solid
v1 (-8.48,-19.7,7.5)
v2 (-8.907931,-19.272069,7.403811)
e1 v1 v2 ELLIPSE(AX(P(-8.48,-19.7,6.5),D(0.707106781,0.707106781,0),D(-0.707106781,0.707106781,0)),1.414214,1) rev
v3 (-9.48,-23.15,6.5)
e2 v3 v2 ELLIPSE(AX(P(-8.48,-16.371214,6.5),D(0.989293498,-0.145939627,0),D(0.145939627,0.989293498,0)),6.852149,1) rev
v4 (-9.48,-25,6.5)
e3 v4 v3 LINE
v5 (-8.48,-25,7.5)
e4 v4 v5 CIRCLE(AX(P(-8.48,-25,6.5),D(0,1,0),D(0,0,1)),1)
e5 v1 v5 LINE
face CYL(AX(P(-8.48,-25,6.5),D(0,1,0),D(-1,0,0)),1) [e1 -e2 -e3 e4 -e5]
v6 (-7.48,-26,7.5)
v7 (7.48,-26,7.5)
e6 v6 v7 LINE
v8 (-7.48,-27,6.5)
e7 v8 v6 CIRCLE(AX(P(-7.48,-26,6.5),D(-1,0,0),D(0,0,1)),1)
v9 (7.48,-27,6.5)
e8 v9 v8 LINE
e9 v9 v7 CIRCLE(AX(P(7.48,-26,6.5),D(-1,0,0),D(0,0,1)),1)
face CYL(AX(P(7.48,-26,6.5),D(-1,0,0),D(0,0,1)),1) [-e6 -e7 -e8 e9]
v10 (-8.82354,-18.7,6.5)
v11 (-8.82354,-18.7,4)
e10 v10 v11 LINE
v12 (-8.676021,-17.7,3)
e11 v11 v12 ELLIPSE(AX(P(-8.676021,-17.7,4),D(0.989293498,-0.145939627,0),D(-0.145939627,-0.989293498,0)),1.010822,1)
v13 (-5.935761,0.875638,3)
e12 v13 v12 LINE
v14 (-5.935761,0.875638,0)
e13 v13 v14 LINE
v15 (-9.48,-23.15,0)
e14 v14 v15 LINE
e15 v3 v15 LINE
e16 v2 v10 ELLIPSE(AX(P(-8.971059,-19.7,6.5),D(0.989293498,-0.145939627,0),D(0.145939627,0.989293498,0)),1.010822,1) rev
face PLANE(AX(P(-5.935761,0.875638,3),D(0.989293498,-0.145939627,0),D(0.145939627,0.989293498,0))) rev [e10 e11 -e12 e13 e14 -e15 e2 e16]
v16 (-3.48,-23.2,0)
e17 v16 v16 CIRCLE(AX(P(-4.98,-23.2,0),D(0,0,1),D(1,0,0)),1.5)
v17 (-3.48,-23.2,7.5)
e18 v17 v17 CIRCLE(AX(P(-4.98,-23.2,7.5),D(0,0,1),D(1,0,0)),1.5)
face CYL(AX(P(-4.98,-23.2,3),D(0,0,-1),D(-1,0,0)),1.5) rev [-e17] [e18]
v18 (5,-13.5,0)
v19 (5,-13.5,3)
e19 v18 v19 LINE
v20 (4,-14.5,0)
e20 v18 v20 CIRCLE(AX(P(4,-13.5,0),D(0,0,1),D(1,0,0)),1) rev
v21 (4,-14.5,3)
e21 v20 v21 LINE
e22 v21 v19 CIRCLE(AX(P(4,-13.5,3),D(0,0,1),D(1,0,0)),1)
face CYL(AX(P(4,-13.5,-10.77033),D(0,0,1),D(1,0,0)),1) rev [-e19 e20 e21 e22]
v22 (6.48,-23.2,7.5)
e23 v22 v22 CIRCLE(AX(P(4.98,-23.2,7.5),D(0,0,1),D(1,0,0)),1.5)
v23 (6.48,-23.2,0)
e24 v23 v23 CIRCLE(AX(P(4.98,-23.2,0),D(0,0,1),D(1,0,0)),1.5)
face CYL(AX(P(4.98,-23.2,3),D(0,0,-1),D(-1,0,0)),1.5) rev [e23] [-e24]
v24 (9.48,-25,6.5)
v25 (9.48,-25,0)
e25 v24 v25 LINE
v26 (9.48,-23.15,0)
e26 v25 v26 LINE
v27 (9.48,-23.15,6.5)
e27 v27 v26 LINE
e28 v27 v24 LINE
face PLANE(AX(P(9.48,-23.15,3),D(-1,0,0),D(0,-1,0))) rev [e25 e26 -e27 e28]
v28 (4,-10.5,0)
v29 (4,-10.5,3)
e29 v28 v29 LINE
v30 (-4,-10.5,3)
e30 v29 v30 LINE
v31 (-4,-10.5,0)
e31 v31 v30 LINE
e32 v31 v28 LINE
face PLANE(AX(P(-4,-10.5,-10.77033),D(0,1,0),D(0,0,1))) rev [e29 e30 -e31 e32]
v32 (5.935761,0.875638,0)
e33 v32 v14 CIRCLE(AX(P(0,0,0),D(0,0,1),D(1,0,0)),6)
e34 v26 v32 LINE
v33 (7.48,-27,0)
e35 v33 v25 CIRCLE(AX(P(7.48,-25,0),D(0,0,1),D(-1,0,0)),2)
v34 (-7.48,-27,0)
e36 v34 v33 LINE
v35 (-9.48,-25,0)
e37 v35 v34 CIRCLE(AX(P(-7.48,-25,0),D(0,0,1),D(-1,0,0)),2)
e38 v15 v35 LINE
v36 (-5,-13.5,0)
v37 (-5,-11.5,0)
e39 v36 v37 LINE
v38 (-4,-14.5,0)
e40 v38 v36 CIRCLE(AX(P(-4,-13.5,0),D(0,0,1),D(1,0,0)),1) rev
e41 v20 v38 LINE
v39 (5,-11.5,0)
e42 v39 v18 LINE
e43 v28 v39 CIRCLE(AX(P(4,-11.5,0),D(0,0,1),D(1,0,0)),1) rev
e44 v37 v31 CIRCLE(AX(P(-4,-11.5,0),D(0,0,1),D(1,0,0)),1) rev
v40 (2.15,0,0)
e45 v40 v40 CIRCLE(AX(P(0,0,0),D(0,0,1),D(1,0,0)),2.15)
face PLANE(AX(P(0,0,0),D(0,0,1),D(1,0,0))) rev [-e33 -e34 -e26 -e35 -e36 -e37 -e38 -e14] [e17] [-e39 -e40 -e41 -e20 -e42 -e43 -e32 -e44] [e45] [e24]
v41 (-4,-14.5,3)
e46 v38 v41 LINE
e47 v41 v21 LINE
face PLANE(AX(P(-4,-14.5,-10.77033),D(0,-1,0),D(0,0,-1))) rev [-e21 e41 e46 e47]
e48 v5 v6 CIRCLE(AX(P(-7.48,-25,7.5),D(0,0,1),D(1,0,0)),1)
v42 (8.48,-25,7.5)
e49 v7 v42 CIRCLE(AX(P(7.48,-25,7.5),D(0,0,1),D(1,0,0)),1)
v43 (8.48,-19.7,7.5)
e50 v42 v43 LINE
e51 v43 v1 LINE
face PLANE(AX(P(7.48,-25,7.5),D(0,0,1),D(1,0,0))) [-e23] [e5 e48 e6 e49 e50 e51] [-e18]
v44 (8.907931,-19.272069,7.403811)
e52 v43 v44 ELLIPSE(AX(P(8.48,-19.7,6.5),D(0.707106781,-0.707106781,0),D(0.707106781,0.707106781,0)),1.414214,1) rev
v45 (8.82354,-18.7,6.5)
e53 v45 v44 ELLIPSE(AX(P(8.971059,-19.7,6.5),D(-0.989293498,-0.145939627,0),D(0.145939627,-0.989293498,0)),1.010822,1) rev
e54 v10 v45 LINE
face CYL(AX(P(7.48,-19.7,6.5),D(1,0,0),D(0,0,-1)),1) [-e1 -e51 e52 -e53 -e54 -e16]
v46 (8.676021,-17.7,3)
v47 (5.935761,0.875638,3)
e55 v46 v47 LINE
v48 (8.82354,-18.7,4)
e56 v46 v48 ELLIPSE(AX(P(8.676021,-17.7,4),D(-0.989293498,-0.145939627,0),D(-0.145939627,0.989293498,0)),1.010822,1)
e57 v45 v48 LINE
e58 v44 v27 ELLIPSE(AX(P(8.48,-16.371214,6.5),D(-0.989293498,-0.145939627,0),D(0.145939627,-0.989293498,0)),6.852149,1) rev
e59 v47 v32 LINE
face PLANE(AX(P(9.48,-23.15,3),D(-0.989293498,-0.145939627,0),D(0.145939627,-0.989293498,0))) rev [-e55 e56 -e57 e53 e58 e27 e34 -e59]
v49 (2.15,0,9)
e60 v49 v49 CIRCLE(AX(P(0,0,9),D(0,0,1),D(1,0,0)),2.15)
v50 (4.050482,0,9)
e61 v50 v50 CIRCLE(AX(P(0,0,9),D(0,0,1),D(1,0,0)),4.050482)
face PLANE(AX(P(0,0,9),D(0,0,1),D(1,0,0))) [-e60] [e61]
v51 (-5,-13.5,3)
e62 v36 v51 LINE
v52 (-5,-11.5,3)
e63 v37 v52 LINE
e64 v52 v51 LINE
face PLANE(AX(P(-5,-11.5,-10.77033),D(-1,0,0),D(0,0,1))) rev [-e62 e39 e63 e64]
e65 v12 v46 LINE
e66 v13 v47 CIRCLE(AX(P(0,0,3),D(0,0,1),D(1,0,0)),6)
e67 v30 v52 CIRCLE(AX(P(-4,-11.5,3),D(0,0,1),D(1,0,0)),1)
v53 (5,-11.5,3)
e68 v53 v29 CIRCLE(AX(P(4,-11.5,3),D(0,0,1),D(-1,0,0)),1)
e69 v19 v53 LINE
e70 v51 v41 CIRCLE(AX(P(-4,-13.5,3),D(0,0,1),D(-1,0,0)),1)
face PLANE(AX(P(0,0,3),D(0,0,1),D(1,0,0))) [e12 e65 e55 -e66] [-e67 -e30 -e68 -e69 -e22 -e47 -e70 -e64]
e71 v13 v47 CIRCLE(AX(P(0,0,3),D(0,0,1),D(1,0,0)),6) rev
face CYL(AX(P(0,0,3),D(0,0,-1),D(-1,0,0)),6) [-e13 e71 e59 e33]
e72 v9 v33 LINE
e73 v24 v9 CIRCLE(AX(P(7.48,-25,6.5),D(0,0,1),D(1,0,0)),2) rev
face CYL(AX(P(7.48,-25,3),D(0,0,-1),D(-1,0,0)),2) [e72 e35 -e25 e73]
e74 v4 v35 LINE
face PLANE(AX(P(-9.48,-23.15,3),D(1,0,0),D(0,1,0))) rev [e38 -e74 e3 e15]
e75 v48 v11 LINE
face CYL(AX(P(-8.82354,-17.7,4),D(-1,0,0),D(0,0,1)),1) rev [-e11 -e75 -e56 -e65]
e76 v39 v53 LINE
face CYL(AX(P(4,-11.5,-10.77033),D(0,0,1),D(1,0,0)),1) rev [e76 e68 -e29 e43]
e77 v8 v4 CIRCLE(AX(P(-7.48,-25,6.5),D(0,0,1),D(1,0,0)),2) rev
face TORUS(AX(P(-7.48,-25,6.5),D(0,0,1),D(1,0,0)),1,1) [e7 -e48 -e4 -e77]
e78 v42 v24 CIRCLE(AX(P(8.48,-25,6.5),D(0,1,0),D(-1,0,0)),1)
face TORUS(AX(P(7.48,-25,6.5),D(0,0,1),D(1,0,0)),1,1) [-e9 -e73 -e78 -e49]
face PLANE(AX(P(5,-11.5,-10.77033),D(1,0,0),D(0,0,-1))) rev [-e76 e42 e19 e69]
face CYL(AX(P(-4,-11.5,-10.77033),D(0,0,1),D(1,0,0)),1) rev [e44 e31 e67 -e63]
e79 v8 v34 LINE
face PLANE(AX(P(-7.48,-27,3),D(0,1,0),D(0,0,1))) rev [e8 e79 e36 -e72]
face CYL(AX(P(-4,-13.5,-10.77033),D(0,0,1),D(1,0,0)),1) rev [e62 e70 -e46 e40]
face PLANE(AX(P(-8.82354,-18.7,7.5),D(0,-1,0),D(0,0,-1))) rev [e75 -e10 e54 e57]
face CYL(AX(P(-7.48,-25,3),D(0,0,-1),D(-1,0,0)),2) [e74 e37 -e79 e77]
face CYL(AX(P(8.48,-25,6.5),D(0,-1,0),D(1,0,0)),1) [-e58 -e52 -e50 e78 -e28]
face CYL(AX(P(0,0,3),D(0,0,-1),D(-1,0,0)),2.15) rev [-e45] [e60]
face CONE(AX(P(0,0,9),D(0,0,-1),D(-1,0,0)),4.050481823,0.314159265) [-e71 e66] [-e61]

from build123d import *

# Parameters (mm, degrees)
SKETCH1_R       = 2.15
SKETCH1_R_2     = 1.5
EXTRUDE1_DEPTH  = 3
SKETCH2_R       = 6
SKETCH2_R_2     = 2.15
EXTRUDE2_DEPTH  = 6
EXTRUDE3_DEPTH  = 3
SKETCH4_R       = 1.5
EXTRUDE4_DEPTH  = 4.5
FILLET5_R       = 1
CHAMFER1_SIZE   = 6
CHAMFER1_SIZE_2 = 1.949518177


with BuildPart() as part:
    # Sketch1 → Extrude1 (new body)
    with BuildSketch(Plane.XY):
        with BuildLine():
            Line((-7.48, -27), (7.48, -27))
            ThreePointArc((7.48, -27), (8.894213562, -26.414213562), (9.48, -25))
            Line((9.48, -25), (9.48, -23.15))
            Line((9.48, -23.15), (5.935760988, 0.875637761))
            ThreePointArc((5.935760988, 0.875637761), (0, 6), (-5.935760988, 0.875637761))
            Line((-5.935760988, 0.875637761), (-9.48, -23.15))
            Line((-9.48, -23.15), (-9.48, -25))
            ThreePointArc((-9.48, -25), (-8.894213562, -26.414213562), (-7.48, -27))
        make_face()
        Circle(SKETCH1_R, mode=Mode.SUBTRACT)
        with Locations((-4.98, -23.2)):
            Circle(SKETCH1_R_2, mode=Mode.SUBTRACT)
        with Locations((4.98, -23.2)):
            Circle(SKETCH1_R_2, mode=Mode.SUBTRACT)
    extrude(amount=EXTRUDE1_DEPTH)

    # Sketch2 → Extrude2 (add)
    with BuildSketch(Plane.XY.offset(3)):
        with Locations(Location((0, 0, 0), (0, 0, 171.608305322))):
            Circle(SKETCH2_R)
        Circle(SKETCH2_R_2, mode=Mode.SUBTRACT)
    extrude(amount=EXTRUDE2_DEPTH)

    # Sketch3 → Extrude3 (cut)
    with BuildSketch(Plane.XY.offset(3)):
        with BuildLine():
            Line((-4, -10.5), (4, -10.5))
            ThreePointArc((4, -10.5), (4.707106781, -10.792893219), (5, -11.5))
            Line((5, -11.5), (5, -13.5))
            ThreePointArc((5, -13.5), (4.707106781, -14.207106781), (4, -14.5))
            Line((4, -14.5), (-4, -14.5))
            ThreePointArc((-4, -14.5), (-4.707106781, -14.207106781), (-5, -13.5))
            Line((-5, -13.5), (-5, -11.5))
            ThreePointArc((-5, -11.5), (-4.707106781, -10.792893219), (-4, -10.5))
        make_face()
    extrude(amount=-EXTRUDE3_DEPTH, mode=Mode.SUBTRACT)

    # Sketch4 → Extrude4 (add)
    with BuildSketch(Plane.XY.offset(3)):
        with BuildLine():
            Line((-7.48, -27), (7.48, -27))
            ThreePointArc((7.48, -27), (8.894213562, -26.414213562), (9.48, -25))
            Line((9.48, -25), (9.48, -23.15))
            Line((9.48, -23.15), (8.823540273, -18.7))
            Line((8.823540273, -18.7), (-8.823540273, -18.7))
            Line((-8.823540273, -18.7), (-9.48, -23.15))
            Line((-9.48, -23.15), (-9.48, -25))
            ThreePointArc((-9.48, -25), (-8.894213562, -26.414213562), (-7.48, -27))
        make_face()
        with Locations((-4.98, -23.2)):
            Circle(SKETCH4_R, mode=Mode.SUBTRACT)
        with Locations((4.98, -23.2)):
            Circle(SKETCH4_R, mode=Mode.SUBTRACT)
    extrude(amount=EXTRUDE4_DEPTH)

    # Fillet5
    # the kernel refuses this fillet: 1 mm, written as the material it adds along each edge
    with BuildSketch(Plane(origin=(14.823540273, -18.7, 3), x_dir=(0, 0, 1), z_dir=(-1, 0, 0))) as fillet5_piece_1_section:
        with BuildLine():
            CenterArc((FILLET5_R, FILLET5_R), FILLET5_R, 180, 90)
            Line((0, FILLET5_R), (-FILLET5_R * 0.02, FILLET5_R))
            Line((-FILLET5_R * 0.02, FILLET5_R), (-FILLET5_R * 0.02, -FILLET5_R * 0.02))
            Line((-FILLET5_R * 0.02, -FILLET5_R * 0.02), (FILLET5_R, -FILLET5_R * 0.02))
            Line((FILLET5_R, -FILLET5_R * 0.02), (FILLET5_R, 0))
        make_face()
    fillet5_piece_1 = extrude(amount=29.647080546, mode=Mode.PRIVATE)
    fillet5_piece_1 = split(fillet5_piece_1, bisect_by=Plane(origin=(-8.603039543, -17.20527274, 3.226855902), z_dir=(0.9892934980650984, -0.1459396268534398, 0)), keep=Keep.TOP, mode=Mode.PRIVATE)
    fillet5_piece_1 = split(fillet5_piece_1, bisect_by=Plane(origin=(8.603039543, -17.20527274, 3.226855902), z_dir=(-0.9892934980650984, -0.14593962685343984, 0)), keep=Keep.TOP, mode=Mode.PRIVATE)
    add(fillet5_piece_1)
    # the kernel refuses this fillet: 1 mm, written as the material it takes off along each edge
    with BuildSketch(Plane(origin=(-9.48, -17.15, 7.5), x_dir=(0, 0, -1), z_dir=(0, -1, 0))) as fillet5_2_piece_1:
        with BuildLine():
            CenterArc((FILLET5_R, FILLET5_R), FILLET5_R, 180, 90)
            Line((0, FILLET5_R), (-FILLET5_R * 0.02, FILLET5_R))
            Line((-FILLET5_R * 0.02, FILLET5_R), (-FILLET5_R * 0.02, -FILLET5_R * 0.02))
            Line((-FILLET5_R * 0.02, -FILLET5_R * 0.02), (FILLET5_R, -FILLET5_R * 0.02))
            Line((FILLET5_R, -FILLET5_R * 0.02), (FILLET5_R, 0))
        make_face()
    extrude(amount=7.85, mode=Mode.SUBTRACT)
    with BuildSketch(Plane(origin=(9.48, -25, 7.5), x_dir=(-1, 0, 0), z_dir=(0, 1, 0))) as fillet5_2_piece_2:
        with BuildLine():
            CenterArc((FILLET5_R, -FILLET5_R), FILLET5_R, 90, 90)
            Line((0, -FILLET5_R), (-FILLET5_R * 0.02, -FILLET5_R))
            Line((-FILLET5_R * 0.02, -FILLET5_R), (-FILLET5_R * 0.02, FILLET5_R * 0.02))
            Line((-FILLET5_R * 0.02, FILLET5_R * 0.02), (FILLET5_R, FILLET5_R * 0.02))
            Line((FILLET5_R, FILLET5_R * 0.02), (FILLET5_R, 0))
        make_face()
    extrude(amount=7.85, mode=Mode.SUBTRACT)
    with BuildSketch(Plane(origin=(-7.48, -27, 7.5), x_dir=(0, 1, 0), z_dir=(1, 0, 0))) as fillet5_2_piece_3:
        with BuildLine():
            CenterArc((FILLET5_R, -FILLET5_R), FILLET5_R, 90, 90)
            Line((0, -FILLET5_R), (-FILLET5_R * 0.02, -FILLET5_R))
            Line((-FILLET5_R * 0.02, -FILLET5_R), (-FILLET5_R * 0.02, FILLET5_R * 0.02))
            Line((-FILLET5_R * 0.02, FILLET5_R * 0.02), (FILLET5_R, FILLET5_R * 0.02))
            Line((FILLET5_R, FILLET5_R * 0.02), (FILLET5_R, 0))
        make_face()
    extrude(amount=14.96, mode=Mode.SUBTRACT)
    with BuildSketch(Plane(origin=(14.823540273, -18.7, 7.5), x_dir=(0, -1, 0), z_dir=(-1, 0, 0))) as fillet5_2_piece_4:
        with BuildLine():
            CenterArc((FILLET5_R, -FILLET5_R), FILLET5_R, 90, 90)
            Line((0, -FILLET5_R), (-FILLET5_R * 0.02, -FILLET5_R))
            Line((-FILLET5_R * 0.02, -FILLET5_R), (-FILLET5_R * 0.02, FILLET5_R * 0.02))
            Line((-FILLET5_R * 0.02, FILLET5_R * 0.02), (FILLET5_R, FILLET5_R * 0.02))
            Line((FILLET5_R, FILLET5_R * 0.02), (FILLET5_R, 0))
        make_face()
    extrude(amount=29.647080546, mode=Mode.SUBTRACT)
    with BuildSketch(Plane(origin=(-7.48, -25, 7.5), x_dir=(-1, 0, 0), z_dir=(0, 1, 0))) as fillet5_2_piece_5:
        with BuildLine():
            CenterArc((2 - FILLET5_R, -FILLET5_R), FILLET5_R, 0, 90)
            Line((2, -FILLET5_R), (2 + FILLET5_R * 0.02, -FILLET5_R))
            Line((2 + FILLET5_R * 0.02, -FILLET5_R), (2 + FILLET5_R * 0.02, FILLET5_R * 0.02))
            Line((2 + FILLET5_R * 0.02, FILLET5_R * 0.02), (2 - FILLET5_R, FILLET5_R * 0.02))
            Line((2 - FILLET5_R, FILLET5_R * 0.02), (2 - FILLET5_R, 0))
        make_face()
    revolve(axis=Axis((-7.48, -25, 7.5), (0, 0, 1)), revolution_arc=90, mode=Mode.SUBTRACT)
    with BuildSketch(Plane(origin=(7.48, -25, 7.5), x_dir=(0, -1, 0), z_dir=(-1, 0, 0))) as fillet5_2_piece_6:
        with BuildLine():
            CenterArc((2 - FILLET5_R, -FILLET5_R), FILLET5_R, 0, 90)
            Line((2, -FILLET5_R), (2 + FILLET5_R * 0.02, -FILLET5_R))
            Line((2 + FILLET5_R * 0.02, -FILLET5_R), (2 + FILLET5_R * 0.02, FILLET5_R * 0.02))
            Line((2 + FILLET5_R * 0.02, FILLET5_R * 0.02), (2 - FILLET5_R, FILLET5_R * 0.02))
            Line((2 - FILLET5_R, FILLET5_R * 0.02), (2 - FILLET5_R, 0))
        make_face()
    revolve(axis=Axis((7.48, -25, 7.5), (0, 0, 1)), revolution_arc=90, mode=Mode.SUBTRACT)

    # Chamfer1
    # the kernel refuses this chamfer: 6, 1.949518177 mm, written as the material it takes off along each edge
    with BuildSketch(Plane(origin=(0, 0, 9), x_dir=(-0.9892934980663286, 0.14593962684510065, 0), z_dir=(0.14593962684510065, 0.9892934980663286, 0))) as chamfer1_piece_1_section:
        Polygon((6, -CHAMFER1_SIZE), (6 - CHAMFER1_SIZE_2, 0), (6, 0), align=None)
    chamfer1_piece_1 = revolve(axis=Axis((0, 0, 9), (0, 0, 1)), mode=Mode.PRIVATE)
    chamfer1_piece_1 = split(chamfer1_piece_1, bisect_by=Plane(origin=(4.992893688, -0.736546882, 3), z_dir=(0, 0, 1)), keep=Keep.TOP, mode=Mode.PRIVATE)
    add(chamfer1_piece_1, mode=Mode.SUBTRACT)


solid = part.part
